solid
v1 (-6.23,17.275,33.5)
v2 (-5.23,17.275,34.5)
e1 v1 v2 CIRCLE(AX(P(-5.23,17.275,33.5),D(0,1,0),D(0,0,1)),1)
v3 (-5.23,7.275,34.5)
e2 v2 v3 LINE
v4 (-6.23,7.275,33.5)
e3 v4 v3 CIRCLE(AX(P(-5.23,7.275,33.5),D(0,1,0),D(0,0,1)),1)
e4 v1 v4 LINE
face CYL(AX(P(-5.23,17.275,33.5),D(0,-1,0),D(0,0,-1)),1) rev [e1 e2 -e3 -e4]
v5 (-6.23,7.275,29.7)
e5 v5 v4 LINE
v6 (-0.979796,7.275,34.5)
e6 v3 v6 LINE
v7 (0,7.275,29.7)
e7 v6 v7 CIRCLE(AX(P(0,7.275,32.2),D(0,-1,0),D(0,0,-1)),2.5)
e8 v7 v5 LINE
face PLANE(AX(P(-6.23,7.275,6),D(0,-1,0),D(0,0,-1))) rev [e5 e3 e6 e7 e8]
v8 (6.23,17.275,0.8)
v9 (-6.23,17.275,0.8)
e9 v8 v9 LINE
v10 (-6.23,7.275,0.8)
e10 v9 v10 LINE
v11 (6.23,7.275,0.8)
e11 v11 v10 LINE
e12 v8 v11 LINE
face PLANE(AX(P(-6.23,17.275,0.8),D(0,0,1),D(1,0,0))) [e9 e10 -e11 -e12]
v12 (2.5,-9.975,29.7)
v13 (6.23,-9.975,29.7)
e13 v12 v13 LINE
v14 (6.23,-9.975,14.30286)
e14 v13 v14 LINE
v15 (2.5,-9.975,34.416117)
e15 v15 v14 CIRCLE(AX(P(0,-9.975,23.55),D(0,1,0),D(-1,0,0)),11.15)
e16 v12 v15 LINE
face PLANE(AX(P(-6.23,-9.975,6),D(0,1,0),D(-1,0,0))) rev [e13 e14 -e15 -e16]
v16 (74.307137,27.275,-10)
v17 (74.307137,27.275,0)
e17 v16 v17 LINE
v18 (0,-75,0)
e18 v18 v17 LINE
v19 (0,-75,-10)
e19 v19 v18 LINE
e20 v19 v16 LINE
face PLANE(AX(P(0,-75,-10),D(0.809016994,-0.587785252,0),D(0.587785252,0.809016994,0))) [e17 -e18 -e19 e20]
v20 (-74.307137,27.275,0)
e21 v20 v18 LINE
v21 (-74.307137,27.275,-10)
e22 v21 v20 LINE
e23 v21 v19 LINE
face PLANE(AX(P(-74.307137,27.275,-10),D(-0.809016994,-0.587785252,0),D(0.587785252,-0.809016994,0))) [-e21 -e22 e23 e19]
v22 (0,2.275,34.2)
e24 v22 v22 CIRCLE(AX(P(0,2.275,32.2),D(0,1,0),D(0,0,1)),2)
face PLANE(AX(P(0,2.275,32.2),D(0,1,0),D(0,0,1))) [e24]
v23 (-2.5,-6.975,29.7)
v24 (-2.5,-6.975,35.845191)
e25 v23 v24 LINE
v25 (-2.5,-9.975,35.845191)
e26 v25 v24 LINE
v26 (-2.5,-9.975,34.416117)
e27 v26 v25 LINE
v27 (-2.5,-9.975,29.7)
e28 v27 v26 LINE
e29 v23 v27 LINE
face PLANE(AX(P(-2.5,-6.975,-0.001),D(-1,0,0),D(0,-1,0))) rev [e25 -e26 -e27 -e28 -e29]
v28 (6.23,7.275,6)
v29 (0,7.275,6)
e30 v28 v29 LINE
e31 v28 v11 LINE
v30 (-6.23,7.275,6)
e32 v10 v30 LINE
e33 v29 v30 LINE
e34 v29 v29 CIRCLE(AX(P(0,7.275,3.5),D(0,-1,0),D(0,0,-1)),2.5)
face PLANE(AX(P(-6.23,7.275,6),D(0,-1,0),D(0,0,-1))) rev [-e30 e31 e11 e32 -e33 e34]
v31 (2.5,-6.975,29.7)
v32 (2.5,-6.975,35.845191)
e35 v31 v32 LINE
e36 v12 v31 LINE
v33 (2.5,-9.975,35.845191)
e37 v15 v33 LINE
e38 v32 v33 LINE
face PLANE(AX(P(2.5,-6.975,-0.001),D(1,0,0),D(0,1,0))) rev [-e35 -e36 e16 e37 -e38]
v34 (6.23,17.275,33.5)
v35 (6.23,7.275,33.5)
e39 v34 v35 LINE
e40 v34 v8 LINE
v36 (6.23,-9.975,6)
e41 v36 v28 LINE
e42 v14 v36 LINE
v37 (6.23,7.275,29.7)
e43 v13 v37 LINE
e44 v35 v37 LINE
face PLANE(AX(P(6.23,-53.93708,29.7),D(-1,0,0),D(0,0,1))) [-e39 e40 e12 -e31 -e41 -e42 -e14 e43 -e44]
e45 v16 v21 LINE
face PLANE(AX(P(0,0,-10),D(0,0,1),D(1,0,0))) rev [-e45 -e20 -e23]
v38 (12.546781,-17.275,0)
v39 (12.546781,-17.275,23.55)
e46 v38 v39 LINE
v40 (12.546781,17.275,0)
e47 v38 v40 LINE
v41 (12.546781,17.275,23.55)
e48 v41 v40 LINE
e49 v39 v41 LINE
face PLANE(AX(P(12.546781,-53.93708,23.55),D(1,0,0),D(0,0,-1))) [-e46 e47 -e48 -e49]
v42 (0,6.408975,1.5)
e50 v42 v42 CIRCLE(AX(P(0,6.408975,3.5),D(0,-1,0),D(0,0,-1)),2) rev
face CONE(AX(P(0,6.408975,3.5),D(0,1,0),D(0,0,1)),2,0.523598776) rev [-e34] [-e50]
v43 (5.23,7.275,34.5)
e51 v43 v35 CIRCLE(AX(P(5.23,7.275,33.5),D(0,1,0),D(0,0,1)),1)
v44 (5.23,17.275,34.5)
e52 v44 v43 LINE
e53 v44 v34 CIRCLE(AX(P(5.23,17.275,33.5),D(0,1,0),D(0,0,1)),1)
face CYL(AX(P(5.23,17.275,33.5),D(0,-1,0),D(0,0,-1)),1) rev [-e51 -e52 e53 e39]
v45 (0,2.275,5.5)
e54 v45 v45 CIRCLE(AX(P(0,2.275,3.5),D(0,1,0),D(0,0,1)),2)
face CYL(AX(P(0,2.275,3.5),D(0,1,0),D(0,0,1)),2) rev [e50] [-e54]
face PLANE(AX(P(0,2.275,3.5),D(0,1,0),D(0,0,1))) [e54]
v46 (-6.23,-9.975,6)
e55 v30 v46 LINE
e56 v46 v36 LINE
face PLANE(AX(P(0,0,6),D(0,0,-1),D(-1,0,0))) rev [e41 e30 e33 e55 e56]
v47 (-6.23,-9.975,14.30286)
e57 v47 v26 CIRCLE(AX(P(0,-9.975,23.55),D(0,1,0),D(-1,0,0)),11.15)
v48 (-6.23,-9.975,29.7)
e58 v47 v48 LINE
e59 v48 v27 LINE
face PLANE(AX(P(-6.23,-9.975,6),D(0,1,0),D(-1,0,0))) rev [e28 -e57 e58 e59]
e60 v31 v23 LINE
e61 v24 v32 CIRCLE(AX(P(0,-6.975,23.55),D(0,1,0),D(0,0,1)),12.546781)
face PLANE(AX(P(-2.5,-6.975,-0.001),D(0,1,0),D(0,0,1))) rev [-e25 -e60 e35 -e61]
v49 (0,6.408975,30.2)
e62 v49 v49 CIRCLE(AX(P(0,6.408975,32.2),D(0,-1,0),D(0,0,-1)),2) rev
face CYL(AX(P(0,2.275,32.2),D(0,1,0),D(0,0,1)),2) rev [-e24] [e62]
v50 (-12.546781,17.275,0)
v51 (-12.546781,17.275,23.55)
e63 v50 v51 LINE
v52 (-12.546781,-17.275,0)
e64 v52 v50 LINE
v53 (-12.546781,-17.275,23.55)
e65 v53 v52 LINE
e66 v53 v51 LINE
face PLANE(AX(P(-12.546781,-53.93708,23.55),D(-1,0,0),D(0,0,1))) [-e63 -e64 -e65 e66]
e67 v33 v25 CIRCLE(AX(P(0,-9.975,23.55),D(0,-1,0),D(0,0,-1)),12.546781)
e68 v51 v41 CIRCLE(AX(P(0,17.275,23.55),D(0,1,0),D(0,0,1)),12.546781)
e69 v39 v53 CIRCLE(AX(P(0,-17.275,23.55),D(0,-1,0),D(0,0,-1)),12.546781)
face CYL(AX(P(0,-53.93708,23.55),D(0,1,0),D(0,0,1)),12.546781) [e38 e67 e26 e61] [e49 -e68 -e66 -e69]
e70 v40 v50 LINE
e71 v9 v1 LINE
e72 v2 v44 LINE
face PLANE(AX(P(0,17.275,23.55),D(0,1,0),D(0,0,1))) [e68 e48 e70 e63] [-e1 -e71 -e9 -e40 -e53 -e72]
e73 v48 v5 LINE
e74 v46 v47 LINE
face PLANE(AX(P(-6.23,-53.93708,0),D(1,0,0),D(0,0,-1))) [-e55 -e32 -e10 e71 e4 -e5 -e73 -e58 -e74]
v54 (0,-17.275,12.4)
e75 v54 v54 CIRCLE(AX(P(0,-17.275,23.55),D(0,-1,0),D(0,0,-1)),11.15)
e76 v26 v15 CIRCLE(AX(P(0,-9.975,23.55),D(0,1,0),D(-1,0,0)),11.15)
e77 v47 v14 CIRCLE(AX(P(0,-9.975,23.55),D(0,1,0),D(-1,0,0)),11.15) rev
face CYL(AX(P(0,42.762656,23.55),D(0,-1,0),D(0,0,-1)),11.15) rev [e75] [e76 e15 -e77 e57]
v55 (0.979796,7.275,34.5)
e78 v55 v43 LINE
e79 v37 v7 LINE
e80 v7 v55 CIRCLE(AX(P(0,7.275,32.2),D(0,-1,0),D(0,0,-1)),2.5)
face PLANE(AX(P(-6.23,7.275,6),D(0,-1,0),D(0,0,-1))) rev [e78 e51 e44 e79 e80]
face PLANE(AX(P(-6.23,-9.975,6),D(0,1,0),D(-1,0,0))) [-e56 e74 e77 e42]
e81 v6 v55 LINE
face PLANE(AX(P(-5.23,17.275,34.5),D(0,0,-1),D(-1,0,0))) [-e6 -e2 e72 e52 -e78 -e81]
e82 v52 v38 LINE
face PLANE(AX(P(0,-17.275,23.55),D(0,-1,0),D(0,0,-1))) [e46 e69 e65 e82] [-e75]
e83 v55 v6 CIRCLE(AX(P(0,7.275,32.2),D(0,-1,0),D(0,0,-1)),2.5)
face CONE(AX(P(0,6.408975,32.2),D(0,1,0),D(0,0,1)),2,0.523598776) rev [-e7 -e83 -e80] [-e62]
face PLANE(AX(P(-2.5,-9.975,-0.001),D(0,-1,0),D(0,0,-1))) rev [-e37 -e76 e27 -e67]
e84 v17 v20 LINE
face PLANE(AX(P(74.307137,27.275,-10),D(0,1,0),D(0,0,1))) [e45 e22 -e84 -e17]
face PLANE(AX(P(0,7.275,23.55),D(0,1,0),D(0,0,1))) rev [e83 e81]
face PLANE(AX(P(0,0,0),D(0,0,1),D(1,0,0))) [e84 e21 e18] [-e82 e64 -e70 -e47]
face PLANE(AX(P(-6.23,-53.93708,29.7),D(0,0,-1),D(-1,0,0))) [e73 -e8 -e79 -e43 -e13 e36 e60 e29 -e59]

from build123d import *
from OCP.BRepFilletAPI import BRepFilletAPI_MakeChamfer

# Parameters (mm, degrees)
SKETCH4_W                = 12.46
SKETCH4_H                = 17.25
BOSS_EXTRUDE3_DEPTH      = 6
BOSS_EXTRUDE6_DEPTH      = 7.3
BOSS_EXTRUDE6_DEPTH_BACK = 17.25
SKETCH8_R                = 12.546781182
SKETCH8_R_2              = 11.15
BOSS_EXTRUDE4_DEPTH      = 17.25
SKETCH6_R                = 2
CUT_EXTRUDE1_DEPTH       = 5
CHAMFER1_SIZE            = 0.5
CHAMFER1_SIZE_2          = 0.866025404
SKETCH10_W               = 12.46
SKETCH10_H               = 23.7
CUT_EXTRUDE3_DEPTH       = 17.25
CUT_EXTRUDE4_REACH       = 43.938
SKETCH11_W               = 5
SKETCH11_H               = 3
BOSS_EXTRUDE7_START      = -7.3
BOSS_EXTRUDE7_DEPTH      = 7.3
BOSS_EXTRUDE9_START      = 10
BOSS_EXTRUDE9_DEPTH      = 10
OFFSET_R_DEPTH           = 10


with BuildPart() as part:
    # Sketch4 → Boss-Extrude3 (new body)
    with BuildSketch(Plane.XY):
        with Locations((0, -1.35)):
            Rectangle(SKETCH4_W, SKETCH4_H)
    extrude(amount=BOSS_EXTRUDE3_DEPTH)



with BuildPart() as body_2:
    # Sketch8 → Boss-Extrude6 (new, two sides: drawn at the far end of the back side and taken through both)
    with BuildSketch(Plane(origin=(0, -9.975, 0), x_dir=(-1, 0, 0), z_dir=(0, -1, 0)).offset(-BOSS_EXTRUDE6_DEPTH_BACK)):
        with Locations(Location((0, -23.55, 0), (0, 0, 90))):
            Circle(SKETCH8_R)
        with Locations(Location((0, -23.55, 0), (0, 0, 90))):
            Circle(SKETCH8_R_2, mode=Mode.SUBTRACT)
    extrude(amount=BOSS_EXTRUDE6_DEPTH + BOSS_EXTRUDE6_DEPTH_BACK)


with BuildPart() as part_1:
    add(part.part)

    add(body_2.part)  # Boss-Extrude4 merges body 2
    # Sketch5 → Boss-Extrude4 (add)
    with BuildSketch(Plane(origin=(0, 7.275, 0), x_dir=(1, 0, 0), z_dir=(0, 1, 0))):
        with BuildLine():
            Line((12.546781182, -23.55), (12.546781182, 0))
            Line((12.546781182, 0), (6.23, 0))
            Line((6.23, 0), (6.23, -29.7))
            Line((6.23, -29.7), (-6.23, -29.7))
            Line((-6.23, -29.7), (-6.23, 0))
            Line((-6.23, 0), (-12.546781182, 0))
            Line((-12.546781182, 0), (-12.546781182, -23.55))
            ThreePointArc((-12.546781182, -23.55), (0, -36.096781182), (12.546781182, -23.55))
        make_face()
    extrude(amount=-BOSS_EXTRUDE4_DEPTH)

    # Sketch6 → Cut-Extrude1 (cut)
    with BuildSketch(Plane(origin=(0, 7.275, 0), x_dir=(1, 0, 0), z_dir=(0, 1, 0))):
        with Locations(Location((0, -3.5, 0), (0, 0, 270))):
            Circle(SKETCH6_R)
        with Locations(Location((0, -32.2, 0), (0, 0, 270))):
            Circle(SKETCH6_R)
    extrude(amount=-CUT_EXTRUDE1_DEPTH, mode=Mode.SUBTRACT)

    # Chamfer1
    chamfer1_edges_1 = [part_1.edges().sort_by_distance(p)[0] for p in [
        (0, 7.275, 1.5),
    ]]
    chamfer1_side_1 = [part_1.faces().sort_by_distance(p)[0] for p in [
        (0, 7.275, 1.49),
    ]]
    chamfer1_edges_2 = [part_1.edges().sort_by_distance(p)[0] for p in [
        (0, 7.275, 30.2),
    ]]
    chamfer1_side_2 = [part_1.faces().sort_by_distance(p)[0] for p in [
        (0, 7.275, 30.19),
    ]]
    chamfer1 = BRepFilletAPI_MakeChamfer(part_1.part.solid().wrapped)
    for e in chamfer1_edges_1:
        chamfer1.Add(CHAMFER1_SIZE - 0.0001, CHAMFER1_SIZE_2 - 0.0001, e.wrapped, chamfer1_side_1[0].wrapped)
    for e in chamfer1_edges_2:
        chamfer1.Add(CHAMFER1_SIZE - 0.0001, CHAMFER1_SIZE_2 - 0.0001, e.wrapped, chamfer1_side_2[0].wrapped)
    add(Compound.cast(chamfer1.Shape()), mode=Mode.REPLACE)  # a hair under: the kernel refuses the full size

    # Sketch10 → Cut-Extrude3 (cut)
    with BuildSketch(Plane(origin=(0, 7.275, 0), x_dir=(1, 0, 0), z_dir=(0, 1, 0))):
        with Locations((0, -17.85)):
            Rectangle(SKETCH10_W, SKETCH10_H)
    extrude(amount=-CUT_EXTRUDE3_DEPTH, mode=Mode.SUBTRACT)

    # Sketch11 → Cut-Extrude4 (cut, up to next)
    with BuildSketch(Plane.XY.offset(36.096781182), mode=Mode.PRIVATE) as cut_extrude4_sk1:
        with Locations((0, -8.475)):
            Rectangle(SKETCH11_W, SKETCH11_H)
    cut_extrude4_tool1 = extrude(cut_extrude4_sk1.sketch, amount=-CUT_EXTRUDE4_REACH, mode=Mode.PRIVATE) & part_1.part
    add(cut_extrude4_tool1.solids().sort_by_distance((0, -8.475, 36.096781))[0], mode=Mode.SUBTRACT)

    # Sketch13 → Boss-Extrude7 (add)
    with BuildSketch(Plane.XZ.offset(17.275).offset(BOSS_EXTRUDE7_START)):
        with BuildLine():
            Line((-12.546781182, 23.55), (-12.546781182, 0))
            Line((-12.546781182, 0), (12.546781182, 0))
            Line((12.546781182, 0), (12.546781182, 23.55))
            ThreePointArc((12.546781182, 23.55), (0, 11.003218818), (-12.546781182, 23.55))
        make_face()
    extrude(amount=BOSS_EXTRUDE7_DEPTH)

    # Sketch15 → Boss-Extrude9 (add)
    with BuildSketch(Plane(origin=(0, 7.275, 0), x_dir=(1, 0, 0), z_dir=(0, 1, 0)).offset(BOSS_EXTRUDE9_START)):
        with BuildLine():
            Line((-12.546781182, 0), (12.546781182, 0))
            Line((12.546781182, 0), (12.546781182, -23.55))
            ThreePointArc((12.546781182, -23.55), (0, -36.096781182), (-12.546781182, -23.55))
            Line((-12.546781182, -23.55), (-12.546781182, 0))
        make_face()
        with BuildLine():
            Line((-6.23, -0.8), (6.23, -0.8))
            Line((6.23, -0.8), (6.23, -33.5))
            ThreePointArc((6.23, -33.5), (5.937106781, -34.207106781), (5.23, -34.5))
            Line((5.23, -34.5), (-5.23, -34.5))
            ThreePointArc((-5.23, -34.5), (-5.937106781, -34.207106781), (-6.23, -33.5))
            Line((-6.23, -33.5), (-6.23, -0.8))
        make_face(mode=Mode.SUBTRACT)
    extrude(amount=-BOSS_EXTRUDE9_DEPTH)

    # Sketch1 → Offset R (add)
    with BuildSketch(Plane.XY):
        Polygon((0, -75), (74.307137052, 27.275), (-74.307137052, 27.275), align=None)
    extrude(amount=-OFFSET_R_DEPTH)


solid = part_1.part
